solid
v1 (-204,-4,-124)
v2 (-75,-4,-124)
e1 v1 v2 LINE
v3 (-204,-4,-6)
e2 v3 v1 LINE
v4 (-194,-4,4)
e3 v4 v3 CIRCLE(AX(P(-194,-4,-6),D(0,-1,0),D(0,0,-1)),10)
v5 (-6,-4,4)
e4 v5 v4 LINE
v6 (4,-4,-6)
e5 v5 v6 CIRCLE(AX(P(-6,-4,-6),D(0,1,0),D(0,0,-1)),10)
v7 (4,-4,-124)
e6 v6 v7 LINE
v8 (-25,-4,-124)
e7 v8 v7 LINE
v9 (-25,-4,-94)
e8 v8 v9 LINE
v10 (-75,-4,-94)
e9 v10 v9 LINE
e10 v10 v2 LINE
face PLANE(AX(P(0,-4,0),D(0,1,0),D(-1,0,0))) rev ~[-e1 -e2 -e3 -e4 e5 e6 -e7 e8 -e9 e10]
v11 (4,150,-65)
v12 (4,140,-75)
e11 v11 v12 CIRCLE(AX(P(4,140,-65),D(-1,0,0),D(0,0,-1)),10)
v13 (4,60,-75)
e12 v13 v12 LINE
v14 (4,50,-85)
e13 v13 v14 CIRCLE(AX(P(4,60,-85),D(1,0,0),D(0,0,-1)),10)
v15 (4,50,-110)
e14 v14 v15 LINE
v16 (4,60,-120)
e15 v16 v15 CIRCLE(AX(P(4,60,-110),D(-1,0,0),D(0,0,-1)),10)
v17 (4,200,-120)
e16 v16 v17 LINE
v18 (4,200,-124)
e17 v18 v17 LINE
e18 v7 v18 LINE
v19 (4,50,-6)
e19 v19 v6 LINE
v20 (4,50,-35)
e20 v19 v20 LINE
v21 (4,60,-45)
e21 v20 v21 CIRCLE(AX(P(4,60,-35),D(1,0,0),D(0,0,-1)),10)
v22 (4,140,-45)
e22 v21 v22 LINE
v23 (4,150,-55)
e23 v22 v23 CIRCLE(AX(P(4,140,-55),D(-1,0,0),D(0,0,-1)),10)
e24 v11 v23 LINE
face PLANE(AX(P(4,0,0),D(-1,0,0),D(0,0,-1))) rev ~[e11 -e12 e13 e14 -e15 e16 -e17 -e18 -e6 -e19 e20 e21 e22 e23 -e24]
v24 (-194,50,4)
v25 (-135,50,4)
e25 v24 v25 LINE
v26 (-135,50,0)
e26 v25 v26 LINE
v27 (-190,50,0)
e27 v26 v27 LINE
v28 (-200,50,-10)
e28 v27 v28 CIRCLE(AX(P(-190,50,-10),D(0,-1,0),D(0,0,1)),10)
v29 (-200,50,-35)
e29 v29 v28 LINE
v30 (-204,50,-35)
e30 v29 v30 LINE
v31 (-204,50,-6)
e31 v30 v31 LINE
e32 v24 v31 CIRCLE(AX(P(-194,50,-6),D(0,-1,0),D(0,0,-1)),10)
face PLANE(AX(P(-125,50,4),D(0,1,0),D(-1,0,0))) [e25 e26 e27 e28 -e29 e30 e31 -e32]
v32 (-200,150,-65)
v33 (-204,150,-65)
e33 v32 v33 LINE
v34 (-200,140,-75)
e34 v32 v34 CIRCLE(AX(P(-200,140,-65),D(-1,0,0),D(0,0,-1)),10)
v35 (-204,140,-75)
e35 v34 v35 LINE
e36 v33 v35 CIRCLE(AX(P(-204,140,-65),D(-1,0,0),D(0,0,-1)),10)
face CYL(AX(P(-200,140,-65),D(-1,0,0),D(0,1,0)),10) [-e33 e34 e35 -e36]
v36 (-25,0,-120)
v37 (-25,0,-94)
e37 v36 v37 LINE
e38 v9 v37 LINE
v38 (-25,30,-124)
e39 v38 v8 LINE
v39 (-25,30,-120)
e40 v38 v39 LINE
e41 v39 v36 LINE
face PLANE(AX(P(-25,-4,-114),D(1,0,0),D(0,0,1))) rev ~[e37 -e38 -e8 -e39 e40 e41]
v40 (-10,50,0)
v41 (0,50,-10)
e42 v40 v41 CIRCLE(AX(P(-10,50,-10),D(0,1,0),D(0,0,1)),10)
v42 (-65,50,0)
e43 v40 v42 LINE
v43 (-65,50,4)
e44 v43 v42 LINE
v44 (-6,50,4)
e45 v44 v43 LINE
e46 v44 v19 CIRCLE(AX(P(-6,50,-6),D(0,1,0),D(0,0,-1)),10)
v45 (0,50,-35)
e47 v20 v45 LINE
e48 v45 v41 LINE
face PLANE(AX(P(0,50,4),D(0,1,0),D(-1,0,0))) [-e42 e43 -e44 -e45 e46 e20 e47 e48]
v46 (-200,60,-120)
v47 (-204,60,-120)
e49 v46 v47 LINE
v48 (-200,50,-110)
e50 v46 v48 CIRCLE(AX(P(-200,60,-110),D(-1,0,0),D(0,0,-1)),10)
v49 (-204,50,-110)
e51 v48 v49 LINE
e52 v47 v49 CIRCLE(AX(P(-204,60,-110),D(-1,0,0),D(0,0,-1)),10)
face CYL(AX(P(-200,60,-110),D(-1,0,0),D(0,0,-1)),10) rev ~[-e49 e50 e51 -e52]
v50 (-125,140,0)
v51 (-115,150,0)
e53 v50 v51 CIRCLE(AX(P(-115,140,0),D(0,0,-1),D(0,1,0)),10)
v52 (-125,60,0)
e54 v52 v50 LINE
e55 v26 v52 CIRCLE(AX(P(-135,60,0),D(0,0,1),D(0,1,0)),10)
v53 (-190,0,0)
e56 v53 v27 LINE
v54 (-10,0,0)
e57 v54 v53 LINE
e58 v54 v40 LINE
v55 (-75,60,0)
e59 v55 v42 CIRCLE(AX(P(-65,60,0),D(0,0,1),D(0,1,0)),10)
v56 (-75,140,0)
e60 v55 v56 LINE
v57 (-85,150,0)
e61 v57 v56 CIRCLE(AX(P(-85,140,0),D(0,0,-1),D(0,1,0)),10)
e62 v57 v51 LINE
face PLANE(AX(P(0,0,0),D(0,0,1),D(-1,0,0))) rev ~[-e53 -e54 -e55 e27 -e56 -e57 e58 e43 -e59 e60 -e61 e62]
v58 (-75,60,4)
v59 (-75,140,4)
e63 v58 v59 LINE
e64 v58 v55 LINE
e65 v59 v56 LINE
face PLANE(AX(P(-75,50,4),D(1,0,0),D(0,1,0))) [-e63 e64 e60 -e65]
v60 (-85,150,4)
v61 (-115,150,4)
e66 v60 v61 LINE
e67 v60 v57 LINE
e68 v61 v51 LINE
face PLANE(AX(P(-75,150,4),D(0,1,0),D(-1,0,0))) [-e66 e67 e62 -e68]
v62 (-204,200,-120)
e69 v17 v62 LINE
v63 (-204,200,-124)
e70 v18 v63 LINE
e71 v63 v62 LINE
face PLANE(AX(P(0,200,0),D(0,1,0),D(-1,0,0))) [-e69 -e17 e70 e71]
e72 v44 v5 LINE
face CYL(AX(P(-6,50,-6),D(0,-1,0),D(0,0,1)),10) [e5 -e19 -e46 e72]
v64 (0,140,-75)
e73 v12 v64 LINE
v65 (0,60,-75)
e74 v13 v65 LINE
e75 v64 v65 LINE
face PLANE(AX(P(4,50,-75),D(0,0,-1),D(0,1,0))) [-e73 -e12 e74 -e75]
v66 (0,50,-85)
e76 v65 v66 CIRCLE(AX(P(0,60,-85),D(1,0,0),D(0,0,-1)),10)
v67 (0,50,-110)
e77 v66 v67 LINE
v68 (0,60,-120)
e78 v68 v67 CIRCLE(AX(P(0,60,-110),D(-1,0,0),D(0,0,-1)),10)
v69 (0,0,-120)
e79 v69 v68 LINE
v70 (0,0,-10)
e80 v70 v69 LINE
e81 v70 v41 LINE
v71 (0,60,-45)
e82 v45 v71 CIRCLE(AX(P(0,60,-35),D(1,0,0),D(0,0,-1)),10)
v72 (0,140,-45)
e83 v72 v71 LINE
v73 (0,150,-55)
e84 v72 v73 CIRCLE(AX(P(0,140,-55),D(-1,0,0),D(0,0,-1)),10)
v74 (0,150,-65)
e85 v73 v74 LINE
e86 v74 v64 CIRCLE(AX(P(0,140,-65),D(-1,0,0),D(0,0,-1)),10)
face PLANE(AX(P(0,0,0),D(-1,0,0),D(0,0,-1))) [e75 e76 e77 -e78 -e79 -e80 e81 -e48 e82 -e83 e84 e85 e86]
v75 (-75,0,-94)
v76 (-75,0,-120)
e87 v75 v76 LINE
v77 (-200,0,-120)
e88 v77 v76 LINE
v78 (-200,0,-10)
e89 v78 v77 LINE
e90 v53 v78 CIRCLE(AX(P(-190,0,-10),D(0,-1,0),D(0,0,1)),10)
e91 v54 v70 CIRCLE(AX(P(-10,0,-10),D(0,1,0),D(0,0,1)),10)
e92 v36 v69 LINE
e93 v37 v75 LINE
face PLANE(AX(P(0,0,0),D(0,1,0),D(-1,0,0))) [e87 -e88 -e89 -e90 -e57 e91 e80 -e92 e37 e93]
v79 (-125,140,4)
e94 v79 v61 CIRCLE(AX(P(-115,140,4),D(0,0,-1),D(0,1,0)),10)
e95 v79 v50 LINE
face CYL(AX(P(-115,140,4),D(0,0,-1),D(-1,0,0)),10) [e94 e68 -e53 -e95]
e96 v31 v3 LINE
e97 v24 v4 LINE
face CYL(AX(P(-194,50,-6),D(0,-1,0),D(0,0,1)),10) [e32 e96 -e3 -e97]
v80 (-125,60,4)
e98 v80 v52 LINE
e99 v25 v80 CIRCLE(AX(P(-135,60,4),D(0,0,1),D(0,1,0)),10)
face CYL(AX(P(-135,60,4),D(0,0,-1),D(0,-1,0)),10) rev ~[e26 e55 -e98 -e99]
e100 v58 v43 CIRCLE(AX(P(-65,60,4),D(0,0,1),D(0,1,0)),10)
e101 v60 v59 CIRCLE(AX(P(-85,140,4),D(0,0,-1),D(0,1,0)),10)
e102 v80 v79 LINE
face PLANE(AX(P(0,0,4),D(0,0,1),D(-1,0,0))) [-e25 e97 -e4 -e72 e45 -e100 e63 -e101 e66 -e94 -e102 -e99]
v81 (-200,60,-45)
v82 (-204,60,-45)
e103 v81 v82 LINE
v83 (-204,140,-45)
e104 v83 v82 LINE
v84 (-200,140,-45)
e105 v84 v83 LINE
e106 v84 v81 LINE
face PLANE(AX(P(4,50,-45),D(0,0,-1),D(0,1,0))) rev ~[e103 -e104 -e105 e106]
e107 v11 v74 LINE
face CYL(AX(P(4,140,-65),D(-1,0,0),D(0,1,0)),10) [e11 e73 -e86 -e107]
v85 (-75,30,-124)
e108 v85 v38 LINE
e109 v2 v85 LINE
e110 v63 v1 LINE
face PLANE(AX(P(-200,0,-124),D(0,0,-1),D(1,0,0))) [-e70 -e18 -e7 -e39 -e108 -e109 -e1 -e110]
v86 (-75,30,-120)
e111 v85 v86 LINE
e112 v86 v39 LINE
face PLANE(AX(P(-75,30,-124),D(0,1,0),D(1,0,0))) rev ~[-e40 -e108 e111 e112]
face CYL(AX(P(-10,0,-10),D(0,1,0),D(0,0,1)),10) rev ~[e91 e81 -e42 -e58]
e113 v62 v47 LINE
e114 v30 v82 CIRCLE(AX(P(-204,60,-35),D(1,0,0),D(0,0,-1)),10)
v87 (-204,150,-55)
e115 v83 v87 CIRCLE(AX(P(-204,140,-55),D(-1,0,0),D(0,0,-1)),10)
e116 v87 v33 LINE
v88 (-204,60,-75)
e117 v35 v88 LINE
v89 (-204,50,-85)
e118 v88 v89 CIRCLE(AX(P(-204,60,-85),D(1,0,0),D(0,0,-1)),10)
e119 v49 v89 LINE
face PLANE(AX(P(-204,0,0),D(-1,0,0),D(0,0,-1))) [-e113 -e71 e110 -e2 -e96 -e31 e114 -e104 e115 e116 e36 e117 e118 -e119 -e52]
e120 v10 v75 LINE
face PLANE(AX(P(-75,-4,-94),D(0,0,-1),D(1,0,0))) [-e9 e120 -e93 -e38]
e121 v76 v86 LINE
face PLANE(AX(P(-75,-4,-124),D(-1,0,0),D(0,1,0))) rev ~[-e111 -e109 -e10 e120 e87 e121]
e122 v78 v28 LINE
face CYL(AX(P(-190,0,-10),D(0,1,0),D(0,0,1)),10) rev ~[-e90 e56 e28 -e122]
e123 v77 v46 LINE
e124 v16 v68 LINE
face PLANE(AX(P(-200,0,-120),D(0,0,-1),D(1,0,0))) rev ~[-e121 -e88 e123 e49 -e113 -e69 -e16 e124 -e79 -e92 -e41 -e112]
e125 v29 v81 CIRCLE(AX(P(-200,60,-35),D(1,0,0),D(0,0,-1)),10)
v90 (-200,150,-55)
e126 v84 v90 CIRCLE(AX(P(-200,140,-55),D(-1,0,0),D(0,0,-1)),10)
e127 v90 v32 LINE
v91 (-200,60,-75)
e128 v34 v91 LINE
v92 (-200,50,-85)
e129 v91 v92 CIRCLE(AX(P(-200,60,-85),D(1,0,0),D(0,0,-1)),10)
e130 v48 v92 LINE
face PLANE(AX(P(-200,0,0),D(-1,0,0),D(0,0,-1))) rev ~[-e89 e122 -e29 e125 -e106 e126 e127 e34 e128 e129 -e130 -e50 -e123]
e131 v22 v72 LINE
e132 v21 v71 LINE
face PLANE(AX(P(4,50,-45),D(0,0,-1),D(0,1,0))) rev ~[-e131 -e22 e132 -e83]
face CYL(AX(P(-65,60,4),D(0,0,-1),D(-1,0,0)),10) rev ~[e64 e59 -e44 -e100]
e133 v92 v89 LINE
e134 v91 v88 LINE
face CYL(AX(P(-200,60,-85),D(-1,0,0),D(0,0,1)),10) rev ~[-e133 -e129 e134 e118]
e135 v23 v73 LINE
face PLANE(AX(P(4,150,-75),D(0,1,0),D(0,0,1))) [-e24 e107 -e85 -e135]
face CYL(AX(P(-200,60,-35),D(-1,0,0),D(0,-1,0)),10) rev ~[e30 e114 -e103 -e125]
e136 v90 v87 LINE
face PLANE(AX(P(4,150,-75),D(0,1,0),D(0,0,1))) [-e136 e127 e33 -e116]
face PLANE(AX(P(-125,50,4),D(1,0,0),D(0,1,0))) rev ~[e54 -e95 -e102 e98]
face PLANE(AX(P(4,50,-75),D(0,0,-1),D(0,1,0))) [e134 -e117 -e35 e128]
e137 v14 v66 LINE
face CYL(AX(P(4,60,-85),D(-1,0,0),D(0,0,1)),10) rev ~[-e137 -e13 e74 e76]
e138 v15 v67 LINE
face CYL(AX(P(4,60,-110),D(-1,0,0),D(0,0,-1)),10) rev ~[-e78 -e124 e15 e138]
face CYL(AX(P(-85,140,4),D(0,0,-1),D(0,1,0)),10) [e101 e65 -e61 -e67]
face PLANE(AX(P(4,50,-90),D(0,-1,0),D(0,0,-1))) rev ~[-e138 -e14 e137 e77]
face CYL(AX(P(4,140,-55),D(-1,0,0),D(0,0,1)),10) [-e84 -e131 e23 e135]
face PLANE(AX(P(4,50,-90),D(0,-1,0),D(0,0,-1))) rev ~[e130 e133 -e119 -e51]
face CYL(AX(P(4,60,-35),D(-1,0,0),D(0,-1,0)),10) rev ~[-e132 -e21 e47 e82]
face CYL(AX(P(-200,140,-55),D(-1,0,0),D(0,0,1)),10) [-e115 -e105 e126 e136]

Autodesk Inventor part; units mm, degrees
ref_plane "YZ Plane" through (0, 0, 0) normal (1, 0, 0) x (0, 1, 0)
ref_plane "XZ Plane" through (0, 0, 0) normal (0, 1, 0) x (-1, 0, 0)
ref_plane "XY Plane" through (0, 0, 0) normal (0, 0, 1) x (1, 0, 0)
sketch "Sketch1" plane through (0, 0, 0) normal (0, 1, 0) x (-1, 0, 0)
  line L0 (0, 0) -> (0, -120)
  line L1 (0, 0) -> (200, 0)
  line L2 (200, 0) -> (200, -120)
  line L3 (200, -120) -> (0, -120)
  dimension "d0" = 120
  dimension "d1" = 200
extrude "Extrusion1" add sketch "Sketch1" along normal blind 200
shell "Shell1" thickness 4 outward yes removed faces 1 at (-66.6667, 200, -40)
sketch "Sketch2" plane through (4, -4, 4) normal (1, 0, 0) x (0, 0, -1)
  line L0 (0, 0) -> (0, 204) projected
  line L1 (0, 0) -> (0, 204)
  line L2 (4, 4) -> (4, 104)
  line L3 (4, 4) -> (4, 204) projected
  line L4 (4, 54) -> (124, 54)
  line L5 (124, 4) -> (124, 204) projected
  line L6 (64, 54) -> (4, 54)
  line L7 (124, 54) -> (64, 54)
  line L8 (94, 54) -> (34, 54)
  line L9 (34, 54) -> (64, 54)
  line L10 (64, 54) -> (94, 54)
  line L11 (79, 54) -> (49, 54)
  line L12 (124, 104) -> (124, 204)
  line L13 (79, 154) -> (49, 154)
  line L14 (79, 54) -> (79, 154)
  line L15 (49, 54) -> (49, 154)
  line L16 (4, 54) -> (4, 204)
  line L17 (4, 204) -> (124, 204)
  line L18 (0, 204) -> (128, 204) projected
  line L19 (124, 204) -> (124, 54)
extrude "Extrusion2" cut sketch "Sketch2" against normal through all contours L2 L3 L17 L5 L4 L14 L13 L15
sketch "Sketch3" plane through (-204, -4, 4) normal (0, 0, 1) x (1, 0, 0)
  line L0 (204, 54) -> (204, 154) projected
  line L1 (4, 4) -> (4, 54) projected
  line L2 (204, 54) -> (4, 54)
  line L3 (4, 54) -> (104, 54)
  line L4 (104, 54) -> (4, 54)
  line L5 (104, 54) -> (54, 54)
  line L6 (208, 54) -> (204, 54) projected
  line L7 (104, 54) -> (204, 54)
  line L8 (204, 54) -> (154, 54)
  line L9 (154, 54) -> (104, 54)
  line L10 (104, 54) -> (54, 54)
  line L11 (79, 54) -> (129, 54)
  line L12 (129, 154) -> (79, 154)
  line L13 (129, 54) -> (129, 154)
  line L14 (79, 54) -> (79, 154)
  line L15 (4, 54) -> (4, 204)
  line L16 (208, 204) -> (0, 204) projected
  line L17 (204, 54) -> (204, 204)
  line L18 (4, 54) -> (0, 54)
  line L19 (0, 0) -> (0, 204) projected
  line L20 (0, 204) -> (0, 54)
  line L21 (0, 204) -> (208, 204)
  line L22 (208, 154) -> (208, 54) projected
  line L23 (208, 0) -> (208, 204) projected
  line L24 (208, 54) -> (208, 204)
  line L25 (204, 54) -> (208, 54)
  point P0 (204, 4)
extrude "Extrusion3" cut sketch "Sketch3" against normal blind 10 contours L2 L13 L12 L14 L15 L16 L17 L0 | L0 L17 L16 L23 L22 L6 | L15 L18 L19 L16
sketch "Sketch4" plane through (0, 200, 0) normal (0, 1, 0) x (1, 0, 0)
  point P0 (0, 0)
fillet "Fillet1" radius 10 18 edges at (2, 50, -45) (2, 50, -75) (2, 50, -120) (-202, 50, -120) (-75, 50, 2) (-125, 50, 2) (-202, 50, -45) (-202, 50, -75) (2, 150, -45) (2, 150, -75) (-75, 150, 2) (-125, 150, 2) (-202, 150, -45) (-202, 150, -75) (0, 25, 0) (-200, 25, 0) (-204, 23, 4) (4, 23, 4)
sketch "Sketch5" plane through (4, -4, -124) normal (0, 0, -1) x (-1, 0, 0)
  line L0 (194, 4) -> (4, 4) projected
  line L1 (204, 4) -> (104, 4)
  line L2 (79, 4) -> (104, 4)
  line L3 (29, 4) -> (4, 4)
  line L4 (79, 4) -> (29, 4)
  line L5 (29, 4) -> (29, 34)
  line L6 (79, 4) -> (79, 34)
  line L7 (79, 34) -> (29, 34)
  line L8 (29, 4) -> (29, 0)
  line L9 (198, 0) -> (10, 0) projected
  line L10 (29, 0) -> (79, 0)
  line L11 (79, 0) -> (79, 4)
  line L12 (4, 4) -> (29, 4)
  line L13 (79, 4) -> (204, 4)
  line L14 (4, 4) -> (29, 4)
  line L15 (79, 4) -> (104, 4)
  dimension "d10" = 30
extrude "Extrusion4" cut sketch "Sketch5" against normal blind 10
sketch "Sketch6" plane through (0, -4, 0) normal (0, -1, 0) x (1, 0, 0)
  line L0 (-25, -114) -> (-25, -124) projected
  line L1 (-25, -124) -> (-25, -94)
  line L2 (-75, -124) -> (-75, -94)
  line L3 (-75, -94) -> (-25, -94)
  line L4 (-25, -124) -> (-75, -124) projected
  line L5 (-25, -124) -> (-75, -124)
  point P0 (0, 0)
  dimension "d13" = 30
extrude "Extrusion5" cut sketch "Sketch6" against normal blind 10
properties part number "bag"
